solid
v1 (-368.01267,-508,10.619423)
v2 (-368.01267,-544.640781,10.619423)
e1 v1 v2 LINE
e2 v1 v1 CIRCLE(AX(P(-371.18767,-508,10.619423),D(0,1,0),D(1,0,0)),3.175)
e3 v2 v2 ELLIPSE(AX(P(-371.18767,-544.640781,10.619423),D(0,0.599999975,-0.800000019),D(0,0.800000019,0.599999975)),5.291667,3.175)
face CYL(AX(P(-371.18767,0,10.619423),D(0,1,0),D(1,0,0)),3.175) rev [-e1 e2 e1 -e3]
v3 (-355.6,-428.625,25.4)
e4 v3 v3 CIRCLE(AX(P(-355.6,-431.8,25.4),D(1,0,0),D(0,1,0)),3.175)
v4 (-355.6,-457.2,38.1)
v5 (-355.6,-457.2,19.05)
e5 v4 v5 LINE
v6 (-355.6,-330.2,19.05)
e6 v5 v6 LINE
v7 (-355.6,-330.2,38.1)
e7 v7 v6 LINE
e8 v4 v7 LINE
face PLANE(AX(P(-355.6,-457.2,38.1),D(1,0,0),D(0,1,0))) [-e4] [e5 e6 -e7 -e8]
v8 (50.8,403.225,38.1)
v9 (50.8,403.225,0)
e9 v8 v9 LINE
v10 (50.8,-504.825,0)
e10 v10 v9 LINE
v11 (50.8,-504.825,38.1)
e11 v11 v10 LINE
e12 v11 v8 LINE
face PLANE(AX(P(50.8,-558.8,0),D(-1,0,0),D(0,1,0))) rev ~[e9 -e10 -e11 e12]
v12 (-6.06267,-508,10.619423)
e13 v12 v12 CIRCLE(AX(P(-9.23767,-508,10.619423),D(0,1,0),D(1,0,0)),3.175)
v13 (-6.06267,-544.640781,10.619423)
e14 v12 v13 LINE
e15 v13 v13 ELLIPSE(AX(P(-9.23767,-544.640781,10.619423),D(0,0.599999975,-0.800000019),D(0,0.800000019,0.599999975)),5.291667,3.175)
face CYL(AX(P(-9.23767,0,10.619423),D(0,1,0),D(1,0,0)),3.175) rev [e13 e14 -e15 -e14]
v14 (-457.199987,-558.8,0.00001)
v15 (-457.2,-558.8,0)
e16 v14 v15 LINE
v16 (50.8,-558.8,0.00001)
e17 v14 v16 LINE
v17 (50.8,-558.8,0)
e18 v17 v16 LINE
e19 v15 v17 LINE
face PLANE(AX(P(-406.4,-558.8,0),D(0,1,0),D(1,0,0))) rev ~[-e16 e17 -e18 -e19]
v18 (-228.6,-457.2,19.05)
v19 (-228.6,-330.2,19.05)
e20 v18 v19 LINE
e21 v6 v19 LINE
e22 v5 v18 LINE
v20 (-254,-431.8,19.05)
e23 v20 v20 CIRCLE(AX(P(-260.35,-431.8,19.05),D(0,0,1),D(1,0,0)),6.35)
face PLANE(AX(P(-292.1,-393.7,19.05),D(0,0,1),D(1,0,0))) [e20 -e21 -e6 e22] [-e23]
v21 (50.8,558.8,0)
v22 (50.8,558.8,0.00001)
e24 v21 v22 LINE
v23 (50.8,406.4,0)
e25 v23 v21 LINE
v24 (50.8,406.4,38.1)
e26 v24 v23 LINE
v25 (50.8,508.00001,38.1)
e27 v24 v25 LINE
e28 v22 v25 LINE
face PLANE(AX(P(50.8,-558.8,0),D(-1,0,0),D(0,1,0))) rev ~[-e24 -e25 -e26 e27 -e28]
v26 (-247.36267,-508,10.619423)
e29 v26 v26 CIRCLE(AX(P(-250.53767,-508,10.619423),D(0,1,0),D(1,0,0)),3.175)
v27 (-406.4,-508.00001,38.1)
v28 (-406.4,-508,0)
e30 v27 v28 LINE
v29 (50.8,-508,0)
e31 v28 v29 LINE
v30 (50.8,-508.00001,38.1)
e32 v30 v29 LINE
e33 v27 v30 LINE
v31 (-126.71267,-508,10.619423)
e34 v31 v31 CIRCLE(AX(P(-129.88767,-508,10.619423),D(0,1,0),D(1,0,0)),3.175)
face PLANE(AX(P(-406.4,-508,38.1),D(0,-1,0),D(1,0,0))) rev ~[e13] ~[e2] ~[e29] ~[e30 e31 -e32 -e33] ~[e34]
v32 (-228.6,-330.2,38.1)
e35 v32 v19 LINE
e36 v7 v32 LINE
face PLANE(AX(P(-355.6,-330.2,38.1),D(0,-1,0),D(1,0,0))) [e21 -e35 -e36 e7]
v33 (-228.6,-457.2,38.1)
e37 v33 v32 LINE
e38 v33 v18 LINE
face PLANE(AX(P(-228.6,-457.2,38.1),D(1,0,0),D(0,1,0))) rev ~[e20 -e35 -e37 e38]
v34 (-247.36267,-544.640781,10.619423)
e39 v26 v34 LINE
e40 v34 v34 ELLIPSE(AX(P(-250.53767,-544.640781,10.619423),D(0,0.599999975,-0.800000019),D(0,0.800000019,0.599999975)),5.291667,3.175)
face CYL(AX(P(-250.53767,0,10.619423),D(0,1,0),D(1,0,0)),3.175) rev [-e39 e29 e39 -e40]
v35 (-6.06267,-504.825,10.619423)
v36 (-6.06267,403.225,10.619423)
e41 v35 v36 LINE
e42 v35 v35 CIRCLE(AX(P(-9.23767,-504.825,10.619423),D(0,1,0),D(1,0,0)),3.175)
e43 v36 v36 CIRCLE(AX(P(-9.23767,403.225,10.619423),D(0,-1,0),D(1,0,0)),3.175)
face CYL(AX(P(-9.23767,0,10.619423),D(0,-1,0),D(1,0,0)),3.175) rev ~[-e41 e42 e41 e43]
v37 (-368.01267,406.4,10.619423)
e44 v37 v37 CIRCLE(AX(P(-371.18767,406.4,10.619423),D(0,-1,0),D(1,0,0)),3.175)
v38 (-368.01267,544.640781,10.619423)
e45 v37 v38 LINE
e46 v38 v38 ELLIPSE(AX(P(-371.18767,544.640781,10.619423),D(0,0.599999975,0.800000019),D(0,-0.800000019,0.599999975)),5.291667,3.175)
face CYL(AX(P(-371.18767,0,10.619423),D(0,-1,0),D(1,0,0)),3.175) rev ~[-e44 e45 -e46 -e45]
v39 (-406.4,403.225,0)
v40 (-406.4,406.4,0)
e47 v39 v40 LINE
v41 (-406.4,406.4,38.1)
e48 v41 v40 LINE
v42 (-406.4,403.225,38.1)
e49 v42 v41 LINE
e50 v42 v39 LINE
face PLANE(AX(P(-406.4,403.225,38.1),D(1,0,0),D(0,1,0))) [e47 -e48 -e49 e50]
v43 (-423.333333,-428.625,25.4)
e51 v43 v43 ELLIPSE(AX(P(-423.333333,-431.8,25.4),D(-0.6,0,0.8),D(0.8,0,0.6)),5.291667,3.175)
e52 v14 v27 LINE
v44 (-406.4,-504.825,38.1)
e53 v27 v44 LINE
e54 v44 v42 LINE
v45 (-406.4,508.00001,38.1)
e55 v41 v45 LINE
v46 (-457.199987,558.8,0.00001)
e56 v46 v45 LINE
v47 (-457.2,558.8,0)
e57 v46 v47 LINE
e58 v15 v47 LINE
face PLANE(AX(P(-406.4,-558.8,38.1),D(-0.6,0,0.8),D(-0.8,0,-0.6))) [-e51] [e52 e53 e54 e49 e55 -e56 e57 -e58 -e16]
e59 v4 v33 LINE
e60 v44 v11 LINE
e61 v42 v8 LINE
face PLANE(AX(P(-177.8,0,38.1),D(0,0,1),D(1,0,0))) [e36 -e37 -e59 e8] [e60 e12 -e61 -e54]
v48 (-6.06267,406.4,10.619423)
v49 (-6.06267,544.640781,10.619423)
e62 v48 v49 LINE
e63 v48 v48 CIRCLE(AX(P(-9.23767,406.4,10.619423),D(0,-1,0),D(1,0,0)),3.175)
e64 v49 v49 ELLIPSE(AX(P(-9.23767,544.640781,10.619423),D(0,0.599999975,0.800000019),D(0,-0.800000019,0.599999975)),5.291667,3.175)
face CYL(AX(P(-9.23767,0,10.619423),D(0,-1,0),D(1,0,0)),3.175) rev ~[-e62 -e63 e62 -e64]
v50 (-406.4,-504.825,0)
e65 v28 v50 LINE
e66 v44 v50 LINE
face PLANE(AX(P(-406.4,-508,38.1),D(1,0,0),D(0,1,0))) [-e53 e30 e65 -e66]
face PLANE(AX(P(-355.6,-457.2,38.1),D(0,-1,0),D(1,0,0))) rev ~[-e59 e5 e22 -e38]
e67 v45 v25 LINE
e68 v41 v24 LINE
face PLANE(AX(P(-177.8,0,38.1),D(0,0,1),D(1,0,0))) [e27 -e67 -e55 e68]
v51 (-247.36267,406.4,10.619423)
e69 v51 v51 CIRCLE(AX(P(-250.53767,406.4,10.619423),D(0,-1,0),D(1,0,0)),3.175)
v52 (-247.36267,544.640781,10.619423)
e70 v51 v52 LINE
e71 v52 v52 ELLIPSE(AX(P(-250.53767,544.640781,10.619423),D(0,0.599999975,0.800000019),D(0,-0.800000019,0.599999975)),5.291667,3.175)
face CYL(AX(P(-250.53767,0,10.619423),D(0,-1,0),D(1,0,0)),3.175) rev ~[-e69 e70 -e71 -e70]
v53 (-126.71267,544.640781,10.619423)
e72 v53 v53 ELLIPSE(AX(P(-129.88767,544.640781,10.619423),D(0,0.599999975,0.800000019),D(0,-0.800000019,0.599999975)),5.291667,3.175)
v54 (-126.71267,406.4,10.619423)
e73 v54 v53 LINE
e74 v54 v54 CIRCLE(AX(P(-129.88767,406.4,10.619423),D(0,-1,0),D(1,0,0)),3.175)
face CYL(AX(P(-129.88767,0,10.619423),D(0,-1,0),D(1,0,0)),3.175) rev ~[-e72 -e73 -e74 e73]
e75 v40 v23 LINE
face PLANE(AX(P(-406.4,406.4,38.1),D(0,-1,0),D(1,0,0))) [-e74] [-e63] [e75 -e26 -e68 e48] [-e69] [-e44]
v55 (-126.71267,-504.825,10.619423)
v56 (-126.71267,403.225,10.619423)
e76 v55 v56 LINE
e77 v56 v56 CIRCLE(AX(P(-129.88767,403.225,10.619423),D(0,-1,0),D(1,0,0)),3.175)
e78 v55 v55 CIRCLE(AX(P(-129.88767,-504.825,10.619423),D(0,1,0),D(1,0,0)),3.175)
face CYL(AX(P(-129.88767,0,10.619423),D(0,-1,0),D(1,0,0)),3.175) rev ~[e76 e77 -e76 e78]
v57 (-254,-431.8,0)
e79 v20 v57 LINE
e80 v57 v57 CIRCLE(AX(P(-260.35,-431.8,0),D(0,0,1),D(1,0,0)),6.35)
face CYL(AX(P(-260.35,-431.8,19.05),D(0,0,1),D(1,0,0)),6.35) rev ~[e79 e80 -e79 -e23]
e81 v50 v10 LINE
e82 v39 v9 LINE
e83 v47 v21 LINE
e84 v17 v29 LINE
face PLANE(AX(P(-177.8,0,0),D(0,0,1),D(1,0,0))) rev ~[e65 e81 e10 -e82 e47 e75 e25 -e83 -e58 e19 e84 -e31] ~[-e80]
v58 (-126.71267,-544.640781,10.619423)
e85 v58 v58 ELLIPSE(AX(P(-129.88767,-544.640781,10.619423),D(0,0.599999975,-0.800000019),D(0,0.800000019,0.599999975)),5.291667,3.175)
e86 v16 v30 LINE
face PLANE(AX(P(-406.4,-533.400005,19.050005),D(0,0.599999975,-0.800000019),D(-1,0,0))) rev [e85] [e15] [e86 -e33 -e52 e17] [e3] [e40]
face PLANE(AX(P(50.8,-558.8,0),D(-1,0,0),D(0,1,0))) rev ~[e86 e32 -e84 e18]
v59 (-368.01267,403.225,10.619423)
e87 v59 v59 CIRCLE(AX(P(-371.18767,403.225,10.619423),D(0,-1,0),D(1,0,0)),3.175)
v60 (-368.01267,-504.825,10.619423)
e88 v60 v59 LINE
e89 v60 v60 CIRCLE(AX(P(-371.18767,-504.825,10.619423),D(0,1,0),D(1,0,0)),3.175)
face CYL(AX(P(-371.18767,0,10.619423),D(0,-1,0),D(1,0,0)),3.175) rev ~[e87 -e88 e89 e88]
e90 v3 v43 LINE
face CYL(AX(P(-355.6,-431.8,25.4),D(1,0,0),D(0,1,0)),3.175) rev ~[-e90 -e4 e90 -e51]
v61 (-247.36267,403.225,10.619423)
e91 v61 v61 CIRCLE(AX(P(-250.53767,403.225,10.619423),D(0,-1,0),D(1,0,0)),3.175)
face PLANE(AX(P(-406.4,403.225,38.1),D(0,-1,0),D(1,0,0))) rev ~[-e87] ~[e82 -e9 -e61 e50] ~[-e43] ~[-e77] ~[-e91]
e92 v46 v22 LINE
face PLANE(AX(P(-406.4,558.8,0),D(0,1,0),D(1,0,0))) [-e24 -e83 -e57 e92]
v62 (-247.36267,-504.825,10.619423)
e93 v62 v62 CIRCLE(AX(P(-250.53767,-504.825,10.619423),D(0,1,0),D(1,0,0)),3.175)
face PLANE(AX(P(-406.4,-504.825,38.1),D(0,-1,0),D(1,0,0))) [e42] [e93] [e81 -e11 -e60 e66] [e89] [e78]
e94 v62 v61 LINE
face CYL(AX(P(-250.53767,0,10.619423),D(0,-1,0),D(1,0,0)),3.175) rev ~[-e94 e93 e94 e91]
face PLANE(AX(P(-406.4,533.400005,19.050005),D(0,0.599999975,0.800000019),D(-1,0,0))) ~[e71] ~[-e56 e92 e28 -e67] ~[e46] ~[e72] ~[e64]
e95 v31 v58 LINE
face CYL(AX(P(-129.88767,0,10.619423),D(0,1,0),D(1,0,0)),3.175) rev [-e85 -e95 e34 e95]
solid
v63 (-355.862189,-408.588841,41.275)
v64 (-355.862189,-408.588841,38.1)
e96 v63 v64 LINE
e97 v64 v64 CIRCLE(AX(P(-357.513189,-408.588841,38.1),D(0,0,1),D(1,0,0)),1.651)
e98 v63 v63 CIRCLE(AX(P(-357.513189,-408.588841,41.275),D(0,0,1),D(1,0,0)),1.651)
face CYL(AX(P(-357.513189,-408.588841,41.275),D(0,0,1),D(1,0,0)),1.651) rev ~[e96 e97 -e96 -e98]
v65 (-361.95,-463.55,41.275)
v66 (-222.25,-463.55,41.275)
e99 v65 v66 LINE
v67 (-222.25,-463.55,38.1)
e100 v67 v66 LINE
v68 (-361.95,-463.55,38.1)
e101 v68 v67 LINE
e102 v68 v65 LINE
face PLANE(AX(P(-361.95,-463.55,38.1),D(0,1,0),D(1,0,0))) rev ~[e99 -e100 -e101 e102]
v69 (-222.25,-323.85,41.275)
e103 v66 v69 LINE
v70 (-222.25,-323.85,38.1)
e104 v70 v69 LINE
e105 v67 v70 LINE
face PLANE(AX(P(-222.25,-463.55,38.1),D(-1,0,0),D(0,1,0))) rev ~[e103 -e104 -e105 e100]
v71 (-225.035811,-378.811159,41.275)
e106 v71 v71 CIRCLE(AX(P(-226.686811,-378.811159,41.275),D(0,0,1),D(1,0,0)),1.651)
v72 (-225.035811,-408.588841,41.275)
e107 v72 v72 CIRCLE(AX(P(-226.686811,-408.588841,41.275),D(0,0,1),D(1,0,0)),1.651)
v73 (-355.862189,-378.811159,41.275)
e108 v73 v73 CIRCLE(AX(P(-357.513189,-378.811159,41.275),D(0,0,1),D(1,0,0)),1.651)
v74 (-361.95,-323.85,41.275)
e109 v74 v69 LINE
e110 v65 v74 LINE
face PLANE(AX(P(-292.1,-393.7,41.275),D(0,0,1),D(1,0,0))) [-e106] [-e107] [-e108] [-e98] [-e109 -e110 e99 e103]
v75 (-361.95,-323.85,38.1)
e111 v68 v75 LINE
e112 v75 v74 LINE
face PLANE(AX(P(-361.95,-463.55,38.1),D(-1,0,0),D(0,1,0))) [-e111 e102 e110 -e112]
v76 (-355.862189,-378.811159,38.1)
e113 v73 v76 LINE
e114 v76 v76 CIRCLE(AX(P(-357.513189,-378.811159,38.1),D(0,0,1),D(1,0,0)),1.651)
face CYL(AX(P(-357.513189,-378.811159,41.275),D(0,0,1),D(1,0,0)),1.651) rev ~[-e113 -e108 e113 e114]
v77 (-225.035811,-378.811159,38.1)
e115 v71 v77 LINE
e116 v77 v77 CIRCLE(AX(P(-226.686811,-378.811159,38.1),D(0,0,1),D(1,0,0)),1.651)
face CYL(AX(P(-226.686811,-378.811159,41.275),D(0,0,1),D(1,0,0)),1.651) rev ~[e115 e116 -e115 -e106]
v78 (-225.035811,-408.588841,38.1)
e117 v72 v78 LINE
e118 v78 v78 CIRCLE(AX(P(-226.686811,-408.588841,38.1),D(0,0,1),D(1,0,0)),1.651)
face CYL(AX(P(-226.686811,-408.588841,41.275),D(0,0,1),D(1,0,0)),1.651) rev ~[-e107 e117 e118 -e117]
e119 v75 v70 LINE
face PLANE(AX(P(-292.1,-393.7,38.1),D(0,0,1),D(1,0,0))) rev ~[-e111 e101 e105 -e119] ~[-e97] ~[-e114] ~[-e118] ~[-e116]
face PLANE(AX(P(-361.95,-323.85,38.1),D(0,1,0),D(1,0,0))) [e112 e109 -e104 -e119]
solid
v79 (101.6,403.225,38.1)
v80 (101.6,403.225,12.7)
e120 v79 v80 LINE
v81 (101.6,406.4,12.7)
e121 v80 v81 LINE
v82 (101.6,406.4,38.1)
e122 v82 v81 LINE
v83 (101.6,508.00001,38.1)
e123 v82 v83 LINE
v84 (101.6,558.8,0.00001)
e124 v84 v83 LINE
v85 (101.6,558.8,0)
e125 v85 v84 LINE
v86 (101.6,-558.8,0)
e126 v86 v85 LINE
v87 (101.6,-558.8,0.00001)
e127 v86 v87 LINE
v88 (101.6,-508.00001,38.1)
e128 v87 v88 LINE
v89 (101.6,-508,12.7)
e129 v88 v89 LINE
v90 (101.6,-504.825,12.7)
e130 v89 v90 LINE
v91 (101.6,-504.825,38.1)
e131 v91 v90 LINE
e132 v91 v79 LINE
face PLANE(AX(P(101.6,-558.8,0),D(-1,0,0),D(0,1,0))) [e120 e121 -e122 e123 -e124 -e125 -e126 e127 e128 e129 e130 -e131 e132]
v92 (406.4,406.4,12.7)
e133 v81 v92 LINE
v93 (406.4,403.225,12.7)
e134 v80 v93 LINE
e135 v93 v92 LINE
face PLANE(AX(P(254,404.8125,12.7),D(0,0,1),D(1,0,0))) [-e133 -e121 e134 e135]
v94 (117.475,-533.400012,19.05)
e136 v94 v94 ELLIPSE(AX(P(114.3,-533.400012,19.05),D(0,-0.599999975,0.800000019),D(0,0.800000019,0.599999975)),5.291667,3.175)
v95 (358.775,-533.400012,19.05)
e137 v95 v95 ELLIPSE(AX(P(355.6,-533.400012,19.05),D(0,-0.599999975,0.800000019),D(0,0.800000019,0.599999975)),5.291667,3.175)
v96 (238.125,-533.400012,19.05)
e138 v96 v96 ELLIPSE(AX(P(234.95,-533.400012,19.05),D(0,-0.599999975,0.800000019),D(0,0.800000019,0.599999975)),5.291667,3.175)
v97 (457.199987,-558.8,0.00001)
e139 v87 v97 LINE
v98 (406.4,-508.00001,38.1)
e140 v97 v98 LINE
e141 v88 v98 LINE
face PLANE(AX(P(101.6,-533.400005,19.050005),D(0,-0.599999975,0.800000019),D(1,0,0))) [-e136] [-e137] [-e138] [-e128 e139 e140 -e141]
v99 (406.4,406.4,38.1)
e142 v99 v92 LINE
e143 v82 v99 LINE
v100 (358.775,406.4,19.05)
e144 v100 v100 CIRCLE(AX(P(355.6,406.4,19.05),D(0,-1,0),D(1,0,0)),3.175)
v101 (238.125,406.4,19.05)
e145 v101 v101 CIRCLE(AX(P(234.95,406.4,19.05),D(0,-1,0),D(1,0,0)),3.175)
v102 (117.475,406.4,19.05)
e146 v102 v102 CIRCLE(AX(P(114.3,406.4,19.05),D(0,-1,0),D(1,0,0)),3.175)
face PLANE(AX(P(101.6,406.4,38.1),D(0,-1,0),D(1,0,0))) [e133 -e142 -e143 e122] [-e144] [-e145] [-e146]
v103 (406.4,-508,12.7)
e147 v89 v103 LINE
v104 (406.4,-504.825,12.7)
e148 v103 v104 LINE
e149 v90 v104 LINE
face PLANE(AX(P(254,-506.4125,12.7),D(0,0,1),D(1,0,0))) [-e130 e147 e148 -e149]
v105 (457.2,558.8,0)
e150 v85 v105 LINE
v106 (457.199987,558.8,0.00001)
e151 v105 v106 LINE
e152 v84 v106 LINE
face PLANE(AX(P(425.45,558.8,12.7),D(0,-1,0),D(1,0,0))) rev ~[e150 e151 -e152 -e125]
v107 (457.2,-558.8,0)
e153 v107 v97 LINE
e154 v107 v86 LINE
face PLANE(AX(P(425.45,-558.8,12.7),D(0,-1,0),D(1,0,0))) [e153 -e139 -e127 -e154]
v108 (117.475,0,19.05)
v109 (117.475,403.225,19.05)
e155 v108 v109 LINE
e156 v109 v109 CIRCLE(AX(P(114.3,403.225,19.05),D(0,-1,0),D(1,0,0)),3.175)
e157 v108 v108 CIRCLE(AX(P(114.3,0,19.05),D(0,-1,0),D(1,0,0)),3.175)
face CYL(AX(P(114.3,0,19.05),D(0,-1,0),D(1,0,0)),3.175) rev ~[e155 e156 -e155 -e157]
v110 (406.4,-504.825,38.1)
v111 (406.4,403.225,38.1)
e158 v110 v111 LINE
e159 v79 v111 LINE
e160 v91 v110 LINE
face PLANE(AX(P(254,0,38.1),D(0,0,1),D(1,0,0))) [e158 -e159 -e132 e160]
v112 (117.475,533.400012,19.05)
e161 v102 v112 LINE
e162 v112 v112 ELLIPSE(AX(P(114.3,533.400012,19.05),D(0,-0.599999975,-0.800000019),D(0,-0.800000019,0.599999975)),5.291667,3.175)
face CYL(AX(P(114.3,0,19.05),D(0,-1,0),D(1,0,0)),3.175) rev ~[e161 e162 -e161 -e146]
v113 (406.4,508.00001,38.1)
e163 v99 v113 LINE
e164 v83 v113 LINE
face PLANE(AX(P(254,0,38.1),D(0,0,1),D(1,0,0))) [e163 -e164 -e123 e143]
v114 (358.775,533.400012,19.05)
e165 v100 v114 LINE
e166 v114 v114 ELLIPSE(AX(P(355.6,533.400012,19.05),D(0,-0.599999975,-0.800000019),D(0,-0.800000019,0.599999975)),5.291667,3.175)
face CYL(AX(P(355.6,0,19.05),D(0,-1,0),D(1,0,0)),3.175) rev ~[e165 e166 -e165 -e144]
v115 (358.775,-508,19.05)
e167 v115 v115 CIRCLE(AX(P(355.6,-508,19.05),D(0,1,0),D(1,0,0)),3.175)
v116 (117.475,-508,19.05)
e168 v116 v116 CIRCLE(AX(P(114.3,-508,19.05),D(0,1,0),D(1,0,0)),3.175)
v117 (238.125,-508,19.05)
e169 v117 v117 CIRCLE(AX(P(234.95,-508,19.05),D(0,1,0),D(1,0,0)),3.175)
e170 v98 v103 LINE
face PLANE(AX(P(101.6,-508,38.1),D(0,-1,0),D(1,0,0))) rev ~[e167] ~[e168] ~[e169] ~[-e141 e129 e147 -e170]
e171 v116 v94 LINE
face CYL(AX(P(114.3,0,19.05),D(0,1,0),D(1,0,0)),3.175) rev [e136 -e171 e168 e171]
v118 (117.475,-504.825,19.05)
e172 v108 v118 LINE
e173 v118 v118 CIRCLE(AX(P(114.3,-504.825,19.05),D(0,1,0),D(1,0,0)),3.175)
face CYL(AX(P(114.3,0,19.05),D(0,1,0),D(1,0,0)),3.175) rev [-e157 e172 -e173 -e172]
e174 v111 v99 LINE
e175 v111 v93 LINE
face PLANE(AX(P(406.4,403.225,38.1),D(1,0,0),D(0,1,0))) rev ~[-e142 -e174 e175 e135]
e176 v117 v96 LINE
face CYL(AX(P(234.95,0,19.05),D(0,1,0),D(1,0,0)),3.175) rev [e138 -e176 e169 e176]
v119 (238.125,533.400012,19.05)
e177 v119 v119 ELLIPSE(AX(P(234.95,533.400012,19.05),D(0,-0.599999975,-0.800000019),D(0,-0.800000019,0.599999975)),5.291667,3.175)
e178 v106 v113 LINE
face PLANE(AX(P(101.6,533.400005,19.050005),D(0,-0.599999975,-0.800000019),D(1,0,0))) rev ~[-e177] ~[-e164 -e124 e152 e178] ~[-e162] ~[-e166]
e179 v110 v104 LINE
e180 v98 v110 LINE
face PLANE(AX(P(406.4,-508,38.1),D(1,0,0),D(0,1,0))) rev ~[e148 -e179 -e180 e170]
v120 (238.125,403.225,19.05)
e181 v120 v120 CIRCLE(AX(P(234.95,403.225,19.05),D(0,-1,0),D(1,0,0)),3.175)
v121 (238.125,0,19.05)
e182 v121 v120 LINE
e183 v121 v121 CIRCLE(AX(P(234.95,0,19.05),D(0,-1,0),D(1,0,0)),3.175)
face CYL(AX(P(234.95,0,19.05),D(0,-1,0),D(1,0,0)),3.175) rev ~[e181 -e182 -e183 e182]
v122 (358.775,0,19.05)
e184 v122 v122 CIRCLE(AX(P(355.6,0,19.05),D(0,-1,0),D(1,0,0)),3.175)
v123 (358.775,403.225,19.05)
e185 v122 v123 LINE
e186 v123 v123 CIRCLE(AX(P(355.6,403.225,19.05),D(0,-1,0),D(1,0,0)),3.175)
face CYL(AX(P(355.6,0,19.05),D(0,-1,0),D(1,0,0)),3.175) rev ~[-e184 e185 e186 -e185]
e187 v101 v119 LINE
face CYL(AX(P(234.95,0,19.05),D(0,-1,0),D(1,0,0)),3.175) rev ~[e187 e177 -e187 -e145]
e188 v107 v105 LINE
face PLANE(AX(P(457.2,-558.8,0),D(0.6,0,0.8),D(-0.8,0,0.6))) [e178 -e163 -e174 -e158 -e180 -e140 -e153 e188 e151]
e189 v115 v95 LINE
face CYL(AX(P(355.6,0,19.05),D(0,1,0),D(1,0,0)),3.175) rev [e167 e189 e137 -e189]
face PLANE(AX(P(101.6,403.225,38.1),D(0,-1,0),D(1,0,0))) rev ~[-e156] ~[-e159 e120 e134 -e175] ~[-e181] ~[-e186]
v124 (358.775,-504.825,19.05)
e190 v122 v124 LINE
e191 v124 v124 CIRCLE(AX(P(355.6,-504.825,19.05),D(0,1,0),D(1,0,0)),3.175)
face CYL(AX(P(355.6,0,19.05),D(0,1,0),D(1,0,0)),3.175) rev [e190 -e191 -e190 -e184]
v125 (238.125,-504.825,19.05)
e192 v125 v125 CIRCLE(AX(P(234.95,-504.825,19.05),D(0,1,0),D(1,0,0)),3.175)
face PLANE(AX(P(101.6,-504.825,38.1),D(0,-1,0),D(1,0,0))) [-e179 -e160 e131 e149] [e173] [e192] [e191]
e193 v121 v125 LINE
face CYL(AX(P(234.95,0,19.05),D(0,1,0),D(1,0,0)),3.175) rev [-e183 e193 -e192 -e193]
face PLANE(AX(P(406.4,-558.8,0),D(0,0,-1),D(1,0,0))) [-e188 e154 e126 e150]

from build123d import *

# Parameters (mm, degrees)
F0_W           = 457.2
F0_H           = 1117.6
F1_DEPTH       = 38.1
F2_SIZE        = 38.09999
F3_W           = 50.8
F3_H           = 50.8
F4_DEPTH       = 406.4
F4_DEPTH_BACK  = 406.4
F5_W           = 203.2
F5_H           = 152.4
F6_DEPTH       = 25.4
F8_DEPTH       = 38.1
F0_W_2         = 304.8
F10_DEPTH      = 1117.6
F11_DEPTH      = 1117.6
F13_DEPTH      = 1117.6
F14_W          = 127
F14_H          = 127
F15_DEPTH      = 19.05
F16_R          = 6.35
F17_DEPTH      = 25.4
F18_R          = 3.175
F19_DEPTH      = 101.601
F20_W          = 139.7
F20_H          = 139.7
F20_W_2        = 127
F20_H_2        = 127
F21_DEPTH      = 3.175
F22_R          = 1.651
F23_DEPTH      = 3.175
F25_SIZE2      = 50.79999
F25_SIZE       = 38.09999
F25_2_SIZE2    = 50.79999
F25_2_SIZE     = 38.09999
F25_3_SIZE2    = 50.79999
F25_3_SIZE     = 38.09999
F25_4_SIZE2    = 50.79999
F25_4_SIZE     = 38.09999
F26_W          = 457.2
F26_H          = 3.175
F27_DEPTH      = 38.101
F28_DEPTH      = 38.101
F29_W          = 304.8
F29_H          = 3.175
F30_DEPTH      = 25.4
F31_R          = 3.175
F32_DEPTH      = 558.801
F32_DEPTH_BACK = 558.801
F33_R          = 3.175
F34_DEPTH      = 558.801
F34_DEPTH_BACK = 558.801


# Not quite as in the source:
# - a fillet or chamfer is up to 0.001 mm smaller than in the source, because OpenCascade refuses the exact size
# - ends of sketch curves that miss each other by under 0.0002 mm in the source are joined


with BuildPart() as f1:
    # F0 (on Top) → F1 (new body)
    with BuildSketch(Plane.XY):
        with Locations((-177.8, 0)):
            Rectangle(F0_W, F0_H)
    extrude(amount=F1_DEPTH)

    # F2 (size 38.1 in the source; OpenCascade refuses exactly that, so slightly less here)
    f2_edges = [f1.edges().sort_by_distance(p)[0] for p in [
        (-177.8, -558.8, 38.1),
        (-177.8, 558.8, 38.1),
    ]]
    chamfer(f2_edges, length=F2_SIZE)

    # F3 (on Front) → F4 (cut, two sides)
    with BuildSketch(Plane.XZ) as f4_sk:
        with Locations((114.3, 25.4)):
            Rectangle(F3_W, F3_H)
    extrude(amount=-F4_DEPTH, mode=Mode.SUBTRACT)
    extrude(f4_sk.sketch, amount=F4_DEPTH_BACK, mode=Mode.SUBTRACT)

    # F5 (on face) → F6 (cut)
    with BuildSketch(Plane.XY.offset(38.1)):
        with Locations((-266.7, -444.5)):
            Rectangle(F5_W, F5_H)
    extrude(amount=-F6_DEPTH, mode=Mode.SUBTRACT)


with BuildPart() as f8:
    # F0 (on Top) → F8 (new body)
    with BuildSketch(Plane.XY):
        with Locations((-177.8, 0)):
            Rectangle(F0_W, F0_H)
    extrude(amount=F8_DEPTH)

    # F12 (on face) → F13 (join, through all)
    with BuildSketch(Plane.XZ.offset(558.8)):
        Polygon((50.8, 38.1), (-406.4, 38.1), (-457.2, 0), (-406.4, 0), (50.8, 0), align=None)
    extrude(amount=-F13_DEPTH)

    # F14 (on face) → F15 (cut)
    with BuildSketch(Plane.XY.offset(38.1)):
        with Locations((-292.1, -393.7)):
            Rectangle(F14_W, F14_H)
    extrude(amount=-F15_DEPTH, mode=Mode.SUBTRACT)

    # F16 (on face) → F17 (cut)
    with BuildSketch(Plane.XY.offset(19.05)):
        with Locations((-260.35, -431.8)):
            Circle(F16_R)
    extrude(amount=-F17_DEPTH, mode=Mode.SUBTRACT)

    # F18 (on face) → F19 (cut, through all)
    with BuildSketch(Plane.YZ.offset(-355.6)):
        with Locations((-431.8, 25.4)):
            Circle(F18_R)
    extrude(amount=-F19_DEPTH, mode=Mode.SUBTRACT)

    # F25 (size 38.1 and 50.8 in the source; OpenCascade refuses exactly that, so slightly less here)
    f25_edges = [f8.edges().sort_by_distance(p)[0] for p in [
        (-177.8, 558.8, 38.1),
    ]]
    f25_side = f8.faces().sort_by_distance((-190.722807, 558.8, 18.715789))[0]
    chamfer(f25_edges, length=F25_SIZE, length2=F25_SIZE2, reference=f25_side)

    # F25#2 (size 38.1 and 50.8 in the source; OpenCascade refuses exactly that, so slightly less here)
    f25_2_edges = [f8.edges().sort_by_distance(p)[0] for p in [
        (-177.8, -558.8, 38.1),
    ]]
    f25_2_side = f8.faces().sort_by_distance((-190.722807, -558.8, 18.715789))[0]
    chamfer(f25_2_edges, length=F25_2_SIZE, length2=F25_2_SIZE2, reference=f25_2_side)

    # F26 (on face) → F27 (cut, through all)
    with BuildSketch(Plane.XY.offset(38.1)):
        with Locations((-177.8, -506.4125)):
            Rectangle(F26_W, F26_H)
        with Locations((-177.8, 404.8125)):
            Rectangle(F26_W, F26_H)
    extrude(amount=-F27_DEPTH, mode=Mode.SUBTRACT)

    # F26 (on face) → F28 (cut, through all)
    with BuildSketch(Plane.XY.offset(38.1)):
        with Locations((-177.8, -506.4125)):
            Rectangle(F26_W, F26_H)
        with Locations((-177.8, 404.8125)):
            Rectangle(F26_W, F26_H)
    extrude(amount=-F28_DEPTH, mode=Mode.SUBTRACT)

    # F33 (on Front) → F34 (cut, two sides)
    with BuildSketch(Plane.XZ) as f34_sk:
        with Locations((-9.2376703805, 10.6194233916)):
            Circle(F33_R)
        with Locations((-129.8876703805, 10.6194233916)):
            Circle(F33_R)
        with Locations((-250.5376703805, 10.6194233916)):
            Circle(F33_R)
        with Locations((-371.1876703805, 10.6194233916)):
            Circle(F33_R)
    extrude(amount=F34_DEPTH, mode=Mode.SUBTRACT)
    extrude(f34_sk.sketch, amount=-F34_DEPTH_BACK, mode=Mode.SUBTRACT)


with BuildPart() as f8b:
    # F0 (on Top) → F8, piece 2 (new body)
    with BuildSketch(Plane.XY):
        with Locations((254, 0)):
            Rectangle(F0_W_2, F0_H)
    extrude(amount=F8_DEPTH)

    # F9 (on face) → F10 (join, through all)
    with BuildSketch(Plane.XZ.offset(558.8)):
        Polygon((457.2, 0), (406.4, 38.1), (406.4, 0), align=None)
    extrude(amount=-F10_DEPTH)

    # F9 (on face) → F11 (join, through all)
    with BuildSketch(Plane.XZ.offset(558.8)):
        Polygon((457.2, 0), (406.4, 38.1), (101.6, 38.1), (101.6, 0), (406.4, 0), align=None)
    extrude(amount=-F11_DEPTH)

    # F25#3 (size 38.1 and 50.8 in the source; OpenCascade refuses exactly that, so slightly less here)
    f25_3_edges = [f8b.edges().sort_by_distance(p)[0] for p in [
        (254, 558.8, 38.1),
    ]]
    f25_3_side = f8b.faces().sort_by_distance((267.025641, 558.8, 18.561538))[0]
    chamfer(f25_3_edges, length=F25_3_SIZE, length2=F25_3_SIZE2, reference=f25_3_side)

    # F25#4 (size 38.1 and 50.8 in the source; OpenCascade refuses exactly that, so slightly less here)
    f25_4_edges = [f8b.edges().sort_by_distance(p)[0] for p in [
        (254, -558.8, 38.1),
    ]]
    f25_4_side = f8b.faces().sort_by_distance((267.025641, -558.8, 18.561538))[0]
    chamfer(f25_4_edges, length=F25_4_SIZE, length2=F25_4_SIZE2, reference=f25_4_side)

    # F29 (on face) → F30 (cut)
    with BuildSketch(Plane.XY.offset(38.1)):
        with Locations((254, -506.4125)):
            Rectangle(F29_W, F29_H)
        with Locations((254, 404.8125)):
            Rectangle(F29_W, F29_H)
    extrude(amount=-F30_DEPTH, mode=Mode.SUBTRACT)

    # F31 (on Front) → F32 (cut, two sides)
    with BuildSketch(Plane.XZ) as f32_sk:
        with Locations((355.6, 19.05)):
            Circle(F31_R)
        with Locations((234.95, 19.05)):
            Circle(F31_R)
        with Locations((114.3, 19.05)):
            Circle(F31_R)
    extrude(amount=-F32_DEPTH, mode=Mode.SUBTRACT)
    extrude(f32_sk.sketch, amount=F32_DEPTH_BACK, mode=Mode.SUBTRACT)


with BuildPart() as f21:
    # F20 (on face) → F21 (new body)
    with BuildSketch(Plane.XY.offset(38.1)):
        with Locations((-292.1, -393.7)):
            Rectangle(F20_W, F20_H)
        with Locations((-292.1, -393.7)):
            Rectangle(F20_W_2, F20_H_2, mode=Mode.SUBTRACT)
        with Locations((-292.1, -393.7)):
            Rectangle(F20_W_2, F20_H_2)
    extrude(amount=F21_DEPTH)

    # F22 (on face) → F23 (cut, through all)
    with BuildSketch(Plane.XY.offset(41.275)):
        with Locations((-357.5131893158, -408.5888405323)):
            Circle(F22_R)
        with Locations((-226.6868106842, -408.5888405323)):
            Circle(F22_R)
        with Locations((-226.6868106842, -378.8111594677)):
            Circle(F22_R)
        with Locations((-357.5131893158, -378.8111594677)):
            Circle(F22_R)
    extrude(amount=-F23_DEPTH, mode=Mode.SUBTRACT)


solid = Compound([f8.part, f8b.part, f21.part])
